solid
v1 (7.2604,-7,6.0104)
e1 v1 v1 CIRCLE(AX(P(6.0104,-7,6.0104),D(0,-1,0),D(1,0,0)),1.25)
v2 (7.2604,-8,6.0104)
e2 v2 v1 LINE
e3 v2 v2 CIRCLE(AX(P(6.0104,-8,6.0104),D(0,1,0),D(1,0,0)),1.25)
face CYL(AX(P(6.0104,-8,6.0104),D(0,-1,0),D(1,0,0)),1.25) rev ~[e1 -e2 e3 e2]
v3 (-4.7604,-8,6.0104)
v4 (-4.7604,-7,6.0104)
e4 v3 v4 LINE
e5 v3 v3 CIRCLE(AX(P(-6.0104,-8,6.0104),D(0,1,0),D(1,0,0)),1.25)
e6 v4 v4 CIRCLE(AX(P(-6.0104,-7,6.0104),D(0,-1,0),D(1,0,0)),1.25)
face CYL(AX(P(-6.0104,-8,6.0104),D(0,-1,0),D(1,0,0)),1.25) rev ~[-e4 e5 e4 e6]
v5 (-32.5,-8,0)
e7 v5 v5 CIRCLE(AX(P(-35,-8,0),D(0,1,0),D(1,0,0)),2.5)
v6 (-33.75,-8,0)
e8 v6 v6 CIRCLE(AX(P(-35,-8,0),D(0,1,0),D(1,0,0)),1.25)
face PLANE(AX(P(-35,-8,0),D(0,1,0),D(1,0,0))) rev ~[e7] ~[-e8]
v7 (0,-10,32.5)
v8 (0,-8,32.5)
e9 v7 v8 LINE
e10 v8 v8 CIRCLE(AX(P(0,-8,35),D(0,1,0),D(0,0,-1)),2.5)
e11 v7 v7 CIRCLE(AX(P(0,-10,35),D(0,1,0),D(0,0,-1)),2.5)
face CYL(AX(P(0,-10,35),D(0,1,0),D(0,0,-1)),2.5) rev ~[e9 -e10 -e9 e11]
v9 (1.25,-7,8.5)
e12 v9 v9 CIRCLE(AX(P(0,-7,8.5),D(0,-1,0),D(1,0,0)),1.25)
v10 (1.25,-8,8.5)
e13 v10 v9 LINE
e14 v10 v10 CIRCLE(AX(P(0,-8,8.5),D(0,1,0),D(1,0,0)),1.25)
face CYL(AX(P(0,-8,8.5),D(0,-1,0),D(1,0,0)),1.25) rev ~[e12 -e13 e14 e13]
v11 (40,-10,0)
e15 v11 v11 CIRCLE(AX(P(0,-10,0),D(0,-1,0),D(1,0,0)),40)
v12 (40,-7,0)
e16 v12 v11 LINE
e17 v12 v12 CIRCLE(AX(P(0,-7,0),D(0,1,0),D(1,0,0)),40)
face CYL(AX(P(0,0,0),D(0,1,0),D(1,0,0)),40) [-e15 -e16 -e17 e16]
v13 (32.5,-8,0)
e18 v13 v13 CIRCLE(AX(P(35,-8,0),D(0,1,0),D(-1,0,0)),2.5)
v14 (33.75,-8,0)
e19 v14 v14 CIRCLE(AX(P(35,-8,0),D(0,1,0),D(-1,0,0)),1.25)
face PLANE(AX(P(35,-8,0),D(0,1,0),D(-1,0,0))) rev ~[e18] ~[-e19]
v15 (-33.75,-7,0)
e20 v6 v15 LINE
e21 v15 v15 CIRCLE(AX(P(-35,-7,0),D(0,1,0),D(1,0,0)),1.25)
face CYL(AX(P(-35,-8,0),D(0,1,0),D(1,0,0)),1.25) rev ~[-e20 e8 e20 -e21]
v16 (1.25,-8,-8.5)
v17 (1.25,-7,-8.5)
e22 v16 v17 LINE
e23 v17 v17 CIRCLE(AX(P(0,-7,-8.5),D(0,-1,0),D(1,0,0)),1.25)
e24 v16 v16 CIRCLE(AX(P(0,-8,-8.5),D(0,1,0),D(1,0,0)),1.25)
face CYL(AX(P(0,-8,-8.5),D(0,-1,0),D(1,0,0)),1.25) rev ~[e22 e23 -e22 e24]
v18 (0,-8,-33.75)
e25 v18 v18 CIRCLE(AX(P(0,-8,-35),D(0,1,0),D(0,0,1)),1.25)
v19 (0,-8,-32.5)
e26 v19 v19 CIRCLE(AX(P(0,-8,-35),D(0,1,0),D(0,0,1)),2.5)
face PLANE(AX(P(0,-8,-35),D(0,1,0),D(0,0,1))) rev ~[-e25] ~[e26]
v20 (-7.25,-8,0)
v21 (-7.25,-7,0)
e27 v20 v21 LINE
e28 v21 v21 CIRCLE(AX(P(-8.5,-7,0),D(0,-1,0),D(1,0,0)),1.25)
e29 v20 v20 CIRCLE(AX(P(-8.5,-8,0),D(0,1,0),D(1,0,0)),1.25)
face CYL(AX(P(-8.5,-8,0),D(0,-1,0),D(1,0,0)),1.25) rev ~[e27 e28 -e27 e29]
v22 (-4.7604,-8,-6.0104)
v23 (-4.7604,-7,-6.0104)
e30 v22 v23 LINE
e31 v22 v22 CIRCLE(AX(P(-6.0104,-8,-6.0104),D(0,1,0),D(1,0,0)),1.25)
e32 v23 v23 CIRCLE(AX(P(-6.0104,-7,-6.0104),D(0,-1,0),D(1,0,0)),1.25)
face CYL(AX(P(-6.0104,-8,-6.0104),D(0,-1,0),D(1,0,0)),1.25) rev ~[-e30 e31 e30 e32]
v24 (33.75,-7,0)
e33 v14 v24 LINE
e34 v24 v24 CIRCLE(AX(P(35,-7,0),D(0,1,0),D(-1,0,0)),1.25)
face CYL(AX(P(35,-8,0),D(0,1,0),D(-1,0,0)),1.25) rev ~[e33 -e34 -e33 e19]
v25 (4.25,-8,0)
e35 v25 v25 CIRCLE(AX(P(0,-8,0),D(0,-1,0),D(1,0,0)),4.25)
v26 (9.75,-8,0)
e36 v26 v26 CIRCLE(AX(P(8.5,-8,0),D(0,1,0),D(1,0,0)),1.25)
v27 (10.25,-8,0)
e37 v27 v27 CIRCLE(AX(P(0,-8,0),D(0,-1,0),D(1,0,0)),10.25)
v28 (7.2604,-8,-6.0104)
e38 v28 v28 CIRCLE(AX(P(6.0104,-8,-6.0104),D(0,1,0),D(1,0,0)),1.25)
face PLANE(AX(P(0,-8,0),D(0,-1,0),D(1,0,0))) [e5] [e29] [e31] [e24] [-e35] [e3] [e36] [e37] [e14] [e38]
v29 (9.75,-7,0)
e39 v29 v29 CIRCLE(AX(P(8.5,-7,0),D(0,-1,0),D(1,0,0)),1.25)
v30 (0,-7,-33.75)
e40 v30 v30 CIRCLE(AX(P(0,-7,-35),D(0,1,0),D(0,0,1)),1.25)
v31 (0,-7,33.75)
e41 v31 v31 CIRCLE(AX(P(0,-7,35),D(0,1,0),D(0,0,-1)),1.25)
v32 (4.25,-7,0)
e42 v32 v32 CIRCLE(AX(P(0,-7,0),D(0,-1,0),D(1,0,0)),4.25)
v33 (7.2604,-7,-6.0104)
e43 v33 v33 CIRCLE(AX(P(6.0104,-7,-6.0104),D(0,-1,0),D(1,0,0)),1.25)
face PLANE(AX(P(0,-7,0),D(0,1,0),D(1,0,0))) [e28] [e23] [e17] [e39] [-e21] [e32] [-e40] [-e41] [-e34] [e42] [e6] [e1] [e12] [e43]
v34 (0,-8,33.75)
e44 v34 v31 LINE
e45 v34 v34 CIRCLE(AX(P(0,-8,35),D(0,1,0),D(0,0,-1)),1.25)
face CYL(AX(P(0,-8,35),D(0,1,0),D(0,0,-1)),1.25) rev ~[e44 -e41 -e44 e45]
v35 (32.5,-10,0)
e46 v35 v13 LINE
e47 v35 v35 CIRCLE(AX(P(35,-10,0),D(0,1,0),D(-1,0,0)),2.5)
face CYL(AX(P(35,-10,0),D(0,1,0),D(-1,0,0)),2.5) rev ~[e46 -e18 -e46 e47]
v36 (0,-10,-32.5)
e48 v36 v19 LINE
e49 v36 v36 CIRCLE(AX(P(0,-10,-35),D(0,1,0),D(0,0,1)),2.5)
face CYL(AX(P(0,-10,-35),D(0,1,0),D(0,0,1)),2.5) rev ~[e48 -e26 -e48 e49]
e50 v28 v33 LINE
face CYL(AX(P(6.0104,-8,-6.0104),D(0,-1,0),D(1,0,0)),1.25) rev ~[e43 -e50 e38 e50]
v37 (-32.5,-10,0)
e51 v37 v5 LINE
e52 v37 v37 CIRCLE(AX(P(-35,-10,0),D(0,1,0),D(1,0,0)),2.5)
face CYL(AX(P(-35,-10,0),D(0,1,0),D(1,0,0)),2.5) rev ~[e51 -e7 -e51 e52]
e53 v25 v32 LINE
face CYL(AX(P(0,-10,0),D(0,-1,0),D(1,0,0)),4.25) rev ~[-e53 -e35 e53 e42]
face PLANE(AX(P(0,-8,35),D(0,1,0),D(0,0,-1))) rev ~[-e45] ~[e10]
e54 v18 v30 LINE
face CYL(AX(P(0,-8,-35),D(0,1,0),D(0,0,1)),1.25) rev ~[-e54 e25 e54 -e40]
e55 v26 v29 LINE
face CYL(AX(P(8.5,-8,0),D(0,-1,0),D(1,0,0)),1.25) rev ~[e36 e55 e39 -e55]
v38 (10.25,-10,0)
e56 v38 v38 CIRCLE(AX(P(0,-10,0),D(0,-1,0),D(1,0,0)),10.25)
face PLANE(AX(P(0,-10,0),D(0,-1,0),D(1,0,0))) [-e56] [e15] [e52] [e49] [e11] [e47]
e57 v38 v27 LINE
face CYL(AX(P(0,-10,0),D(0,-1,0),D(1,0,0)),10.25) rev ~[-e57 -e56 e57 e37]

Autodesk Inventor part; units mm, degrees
ref_plane "YZ Plane" through (0, 0, 0) normal (1, 0, 0) x (0, 1, 0)
ref_plane "XZ Plane" through (0, 0, 0) normal (0, 1, 0) x (-1, 0, 0)
ref_plane "XY Plane" through (0, 0, 0) normal (0, 0, 1) x (1, 0, 0)
sketch "Sketch1" plane through (0, 0, 0) normal (0, 1, 0) x (-1, 0, 0)
  circle A0 centre (0, 0) radius 30
  circle A1 centre (0, 0) radius 45
  circle A2 centre (0, 0) radius 20
  dimension "d0" = 60
  dimension "d1" = 90
  dimension "d2" = 40
extrude "Extrusion1" add sketch "Sketch1" along normal blind 20 draft -4 contours A0
sketch "Sketch2" plane through (0, 20, 0) normal (0, 1, 0) x (1, 0, 0)
  circle A0 centre (0, 0) radius 28.6015
  circle A1 centre (0, 0) radius 21.3985
extrude "Extrusion2" add sketch "Sketch2" along normal blind 20 draft 4
sketch "Sketch3" plane through (0, 40, 0) normal (0, 1, 0) x (1, 0, 0)
  circle A0 centre (0, 0) radius 40
  dimension "d7" = 80
extrude "Extrusion3" add sketch "Sketch3" along normal blind 10
sketch "Sketch4" plane through (0, 0, 0) normal (0, -1, 0) x (1, 0, 0)
  circle A0 centre (0, 0) radius 40
  dimension "d10" = 80
extrude "Extrusion4" add sketch "Sketch4" along normal blind 10
sketch "Sketch5" plane through (0, -10, 0) normal (0, -1, 0) x (1, 0, 0)
  circle A0 centre (0, 0) radius 2.25
  circle A1 centre (0, 0) radius 4.25
  circle A2 centre (0, 0) radius 10.25
  dimension "d13" = 4.5
  dimension "d16" = 8.5
  dimension "d17" = 20.5
extrude "Extrusion9" cut sketch "Sketch5" against normal blind 2 contours A2
extrude "Extrusion10" cut sketch "Sketch5" against normal blind 4 contours A0 | A1
sketch "Sketch6" plane through (0, -8, 0) normal (0, -1, 0) x (1, 0, 0)
  circle A0 centre (0, 8.5) radius 1.25
  circle A1 centre (0, 0) radius 8.5
  circle A2 centre (-6.0104, 6.0104) radius 1.25
  circle A3 centre (-8.5, 0) radius 1.25
  circle A4 centre (-6.0104, -6.0104) radius 1.25
  circle A5 centre (0, -8.5) radius 1.25
  circle A6 centre (6.0104, -6.0104) radius 1.25
  circle A7 centre (8.5, 0) radius 1.25
  circle A8 centre (6.0104, 6.0104) radius 1.25
  circle A9 centre (0, 0) radius 10.25 projected
  line L0 (0, 8.5) -> (0, 7.25) construction
  line L1 (0, -8.5) -> (0, -7.25) construction
  line L2 (0, 7.25) -> (0, 0) construction
  point P0 (5.0639, 6.8269)
  point P1 (6.8269, 5.0639)
  dimension "d34" = 2.5
  dimension "d30" = 360
  dimension "d36" = 14.5
  dimension "d37" = 1.25
extrude "Extrusion11" cut sketch "Sketch6" against normal through all contours A0 A1 | A1 A0 | A2 A1 | A1 A2 | A8 A1 | A1 A8 | A3 A1 | A1 A3 | A7 A1 | A1 A7 | A4 A1 | A1 A4 | A6 A1 | A1 A6 | A5 A1 | A1 A5
sketch "Sketch7" plane through (0, -10, 0) normal (0, -1, 0) x (1, 0, 0)
  point P0 (0, 0)
sketch "Sketch8" plane through (0, 50, 0) normal (0, 1, 0) x (1, 0, 0)
  circle A0 centre (0, 0) radius 69.6174
extrude "Extrusion12" cut sketch "Sketch8" against normal blind 57
sketch "Sketch12" plane through (0, -10, 0) normal (0, -1, 0) x (1, 0, 0)
  circle A0 centre (0, 0) radius 4.25 projected
  circle A1 centre (0, 0) radius 35 construction
  point P0 (0, 35)
  dimension "d57" = 70
hole "Hole2" at (0, -10, 35) direction (0, 1, 0) diameter 2.5 depth 8 tip angle 118 counterbore diameter 5 counterbore depth 2
pattern_circular "Circular Pattern2" count 4 over 360 about axis through (0, 0, 0) along (0, -1, 0) of "Hole2"
sketch "Sketch9" plane through (0, -10, 0) normal (0, -1, 0) x (1, 0, 0)
  circle A0 centre (0, 0) radius 16.7725
  circle A1 centre (0, 0) radius 4.25 projected
  circle A2 centre (0, 0) radius 45.7596
properties part number "spool_test" material "ABS Plastic"
